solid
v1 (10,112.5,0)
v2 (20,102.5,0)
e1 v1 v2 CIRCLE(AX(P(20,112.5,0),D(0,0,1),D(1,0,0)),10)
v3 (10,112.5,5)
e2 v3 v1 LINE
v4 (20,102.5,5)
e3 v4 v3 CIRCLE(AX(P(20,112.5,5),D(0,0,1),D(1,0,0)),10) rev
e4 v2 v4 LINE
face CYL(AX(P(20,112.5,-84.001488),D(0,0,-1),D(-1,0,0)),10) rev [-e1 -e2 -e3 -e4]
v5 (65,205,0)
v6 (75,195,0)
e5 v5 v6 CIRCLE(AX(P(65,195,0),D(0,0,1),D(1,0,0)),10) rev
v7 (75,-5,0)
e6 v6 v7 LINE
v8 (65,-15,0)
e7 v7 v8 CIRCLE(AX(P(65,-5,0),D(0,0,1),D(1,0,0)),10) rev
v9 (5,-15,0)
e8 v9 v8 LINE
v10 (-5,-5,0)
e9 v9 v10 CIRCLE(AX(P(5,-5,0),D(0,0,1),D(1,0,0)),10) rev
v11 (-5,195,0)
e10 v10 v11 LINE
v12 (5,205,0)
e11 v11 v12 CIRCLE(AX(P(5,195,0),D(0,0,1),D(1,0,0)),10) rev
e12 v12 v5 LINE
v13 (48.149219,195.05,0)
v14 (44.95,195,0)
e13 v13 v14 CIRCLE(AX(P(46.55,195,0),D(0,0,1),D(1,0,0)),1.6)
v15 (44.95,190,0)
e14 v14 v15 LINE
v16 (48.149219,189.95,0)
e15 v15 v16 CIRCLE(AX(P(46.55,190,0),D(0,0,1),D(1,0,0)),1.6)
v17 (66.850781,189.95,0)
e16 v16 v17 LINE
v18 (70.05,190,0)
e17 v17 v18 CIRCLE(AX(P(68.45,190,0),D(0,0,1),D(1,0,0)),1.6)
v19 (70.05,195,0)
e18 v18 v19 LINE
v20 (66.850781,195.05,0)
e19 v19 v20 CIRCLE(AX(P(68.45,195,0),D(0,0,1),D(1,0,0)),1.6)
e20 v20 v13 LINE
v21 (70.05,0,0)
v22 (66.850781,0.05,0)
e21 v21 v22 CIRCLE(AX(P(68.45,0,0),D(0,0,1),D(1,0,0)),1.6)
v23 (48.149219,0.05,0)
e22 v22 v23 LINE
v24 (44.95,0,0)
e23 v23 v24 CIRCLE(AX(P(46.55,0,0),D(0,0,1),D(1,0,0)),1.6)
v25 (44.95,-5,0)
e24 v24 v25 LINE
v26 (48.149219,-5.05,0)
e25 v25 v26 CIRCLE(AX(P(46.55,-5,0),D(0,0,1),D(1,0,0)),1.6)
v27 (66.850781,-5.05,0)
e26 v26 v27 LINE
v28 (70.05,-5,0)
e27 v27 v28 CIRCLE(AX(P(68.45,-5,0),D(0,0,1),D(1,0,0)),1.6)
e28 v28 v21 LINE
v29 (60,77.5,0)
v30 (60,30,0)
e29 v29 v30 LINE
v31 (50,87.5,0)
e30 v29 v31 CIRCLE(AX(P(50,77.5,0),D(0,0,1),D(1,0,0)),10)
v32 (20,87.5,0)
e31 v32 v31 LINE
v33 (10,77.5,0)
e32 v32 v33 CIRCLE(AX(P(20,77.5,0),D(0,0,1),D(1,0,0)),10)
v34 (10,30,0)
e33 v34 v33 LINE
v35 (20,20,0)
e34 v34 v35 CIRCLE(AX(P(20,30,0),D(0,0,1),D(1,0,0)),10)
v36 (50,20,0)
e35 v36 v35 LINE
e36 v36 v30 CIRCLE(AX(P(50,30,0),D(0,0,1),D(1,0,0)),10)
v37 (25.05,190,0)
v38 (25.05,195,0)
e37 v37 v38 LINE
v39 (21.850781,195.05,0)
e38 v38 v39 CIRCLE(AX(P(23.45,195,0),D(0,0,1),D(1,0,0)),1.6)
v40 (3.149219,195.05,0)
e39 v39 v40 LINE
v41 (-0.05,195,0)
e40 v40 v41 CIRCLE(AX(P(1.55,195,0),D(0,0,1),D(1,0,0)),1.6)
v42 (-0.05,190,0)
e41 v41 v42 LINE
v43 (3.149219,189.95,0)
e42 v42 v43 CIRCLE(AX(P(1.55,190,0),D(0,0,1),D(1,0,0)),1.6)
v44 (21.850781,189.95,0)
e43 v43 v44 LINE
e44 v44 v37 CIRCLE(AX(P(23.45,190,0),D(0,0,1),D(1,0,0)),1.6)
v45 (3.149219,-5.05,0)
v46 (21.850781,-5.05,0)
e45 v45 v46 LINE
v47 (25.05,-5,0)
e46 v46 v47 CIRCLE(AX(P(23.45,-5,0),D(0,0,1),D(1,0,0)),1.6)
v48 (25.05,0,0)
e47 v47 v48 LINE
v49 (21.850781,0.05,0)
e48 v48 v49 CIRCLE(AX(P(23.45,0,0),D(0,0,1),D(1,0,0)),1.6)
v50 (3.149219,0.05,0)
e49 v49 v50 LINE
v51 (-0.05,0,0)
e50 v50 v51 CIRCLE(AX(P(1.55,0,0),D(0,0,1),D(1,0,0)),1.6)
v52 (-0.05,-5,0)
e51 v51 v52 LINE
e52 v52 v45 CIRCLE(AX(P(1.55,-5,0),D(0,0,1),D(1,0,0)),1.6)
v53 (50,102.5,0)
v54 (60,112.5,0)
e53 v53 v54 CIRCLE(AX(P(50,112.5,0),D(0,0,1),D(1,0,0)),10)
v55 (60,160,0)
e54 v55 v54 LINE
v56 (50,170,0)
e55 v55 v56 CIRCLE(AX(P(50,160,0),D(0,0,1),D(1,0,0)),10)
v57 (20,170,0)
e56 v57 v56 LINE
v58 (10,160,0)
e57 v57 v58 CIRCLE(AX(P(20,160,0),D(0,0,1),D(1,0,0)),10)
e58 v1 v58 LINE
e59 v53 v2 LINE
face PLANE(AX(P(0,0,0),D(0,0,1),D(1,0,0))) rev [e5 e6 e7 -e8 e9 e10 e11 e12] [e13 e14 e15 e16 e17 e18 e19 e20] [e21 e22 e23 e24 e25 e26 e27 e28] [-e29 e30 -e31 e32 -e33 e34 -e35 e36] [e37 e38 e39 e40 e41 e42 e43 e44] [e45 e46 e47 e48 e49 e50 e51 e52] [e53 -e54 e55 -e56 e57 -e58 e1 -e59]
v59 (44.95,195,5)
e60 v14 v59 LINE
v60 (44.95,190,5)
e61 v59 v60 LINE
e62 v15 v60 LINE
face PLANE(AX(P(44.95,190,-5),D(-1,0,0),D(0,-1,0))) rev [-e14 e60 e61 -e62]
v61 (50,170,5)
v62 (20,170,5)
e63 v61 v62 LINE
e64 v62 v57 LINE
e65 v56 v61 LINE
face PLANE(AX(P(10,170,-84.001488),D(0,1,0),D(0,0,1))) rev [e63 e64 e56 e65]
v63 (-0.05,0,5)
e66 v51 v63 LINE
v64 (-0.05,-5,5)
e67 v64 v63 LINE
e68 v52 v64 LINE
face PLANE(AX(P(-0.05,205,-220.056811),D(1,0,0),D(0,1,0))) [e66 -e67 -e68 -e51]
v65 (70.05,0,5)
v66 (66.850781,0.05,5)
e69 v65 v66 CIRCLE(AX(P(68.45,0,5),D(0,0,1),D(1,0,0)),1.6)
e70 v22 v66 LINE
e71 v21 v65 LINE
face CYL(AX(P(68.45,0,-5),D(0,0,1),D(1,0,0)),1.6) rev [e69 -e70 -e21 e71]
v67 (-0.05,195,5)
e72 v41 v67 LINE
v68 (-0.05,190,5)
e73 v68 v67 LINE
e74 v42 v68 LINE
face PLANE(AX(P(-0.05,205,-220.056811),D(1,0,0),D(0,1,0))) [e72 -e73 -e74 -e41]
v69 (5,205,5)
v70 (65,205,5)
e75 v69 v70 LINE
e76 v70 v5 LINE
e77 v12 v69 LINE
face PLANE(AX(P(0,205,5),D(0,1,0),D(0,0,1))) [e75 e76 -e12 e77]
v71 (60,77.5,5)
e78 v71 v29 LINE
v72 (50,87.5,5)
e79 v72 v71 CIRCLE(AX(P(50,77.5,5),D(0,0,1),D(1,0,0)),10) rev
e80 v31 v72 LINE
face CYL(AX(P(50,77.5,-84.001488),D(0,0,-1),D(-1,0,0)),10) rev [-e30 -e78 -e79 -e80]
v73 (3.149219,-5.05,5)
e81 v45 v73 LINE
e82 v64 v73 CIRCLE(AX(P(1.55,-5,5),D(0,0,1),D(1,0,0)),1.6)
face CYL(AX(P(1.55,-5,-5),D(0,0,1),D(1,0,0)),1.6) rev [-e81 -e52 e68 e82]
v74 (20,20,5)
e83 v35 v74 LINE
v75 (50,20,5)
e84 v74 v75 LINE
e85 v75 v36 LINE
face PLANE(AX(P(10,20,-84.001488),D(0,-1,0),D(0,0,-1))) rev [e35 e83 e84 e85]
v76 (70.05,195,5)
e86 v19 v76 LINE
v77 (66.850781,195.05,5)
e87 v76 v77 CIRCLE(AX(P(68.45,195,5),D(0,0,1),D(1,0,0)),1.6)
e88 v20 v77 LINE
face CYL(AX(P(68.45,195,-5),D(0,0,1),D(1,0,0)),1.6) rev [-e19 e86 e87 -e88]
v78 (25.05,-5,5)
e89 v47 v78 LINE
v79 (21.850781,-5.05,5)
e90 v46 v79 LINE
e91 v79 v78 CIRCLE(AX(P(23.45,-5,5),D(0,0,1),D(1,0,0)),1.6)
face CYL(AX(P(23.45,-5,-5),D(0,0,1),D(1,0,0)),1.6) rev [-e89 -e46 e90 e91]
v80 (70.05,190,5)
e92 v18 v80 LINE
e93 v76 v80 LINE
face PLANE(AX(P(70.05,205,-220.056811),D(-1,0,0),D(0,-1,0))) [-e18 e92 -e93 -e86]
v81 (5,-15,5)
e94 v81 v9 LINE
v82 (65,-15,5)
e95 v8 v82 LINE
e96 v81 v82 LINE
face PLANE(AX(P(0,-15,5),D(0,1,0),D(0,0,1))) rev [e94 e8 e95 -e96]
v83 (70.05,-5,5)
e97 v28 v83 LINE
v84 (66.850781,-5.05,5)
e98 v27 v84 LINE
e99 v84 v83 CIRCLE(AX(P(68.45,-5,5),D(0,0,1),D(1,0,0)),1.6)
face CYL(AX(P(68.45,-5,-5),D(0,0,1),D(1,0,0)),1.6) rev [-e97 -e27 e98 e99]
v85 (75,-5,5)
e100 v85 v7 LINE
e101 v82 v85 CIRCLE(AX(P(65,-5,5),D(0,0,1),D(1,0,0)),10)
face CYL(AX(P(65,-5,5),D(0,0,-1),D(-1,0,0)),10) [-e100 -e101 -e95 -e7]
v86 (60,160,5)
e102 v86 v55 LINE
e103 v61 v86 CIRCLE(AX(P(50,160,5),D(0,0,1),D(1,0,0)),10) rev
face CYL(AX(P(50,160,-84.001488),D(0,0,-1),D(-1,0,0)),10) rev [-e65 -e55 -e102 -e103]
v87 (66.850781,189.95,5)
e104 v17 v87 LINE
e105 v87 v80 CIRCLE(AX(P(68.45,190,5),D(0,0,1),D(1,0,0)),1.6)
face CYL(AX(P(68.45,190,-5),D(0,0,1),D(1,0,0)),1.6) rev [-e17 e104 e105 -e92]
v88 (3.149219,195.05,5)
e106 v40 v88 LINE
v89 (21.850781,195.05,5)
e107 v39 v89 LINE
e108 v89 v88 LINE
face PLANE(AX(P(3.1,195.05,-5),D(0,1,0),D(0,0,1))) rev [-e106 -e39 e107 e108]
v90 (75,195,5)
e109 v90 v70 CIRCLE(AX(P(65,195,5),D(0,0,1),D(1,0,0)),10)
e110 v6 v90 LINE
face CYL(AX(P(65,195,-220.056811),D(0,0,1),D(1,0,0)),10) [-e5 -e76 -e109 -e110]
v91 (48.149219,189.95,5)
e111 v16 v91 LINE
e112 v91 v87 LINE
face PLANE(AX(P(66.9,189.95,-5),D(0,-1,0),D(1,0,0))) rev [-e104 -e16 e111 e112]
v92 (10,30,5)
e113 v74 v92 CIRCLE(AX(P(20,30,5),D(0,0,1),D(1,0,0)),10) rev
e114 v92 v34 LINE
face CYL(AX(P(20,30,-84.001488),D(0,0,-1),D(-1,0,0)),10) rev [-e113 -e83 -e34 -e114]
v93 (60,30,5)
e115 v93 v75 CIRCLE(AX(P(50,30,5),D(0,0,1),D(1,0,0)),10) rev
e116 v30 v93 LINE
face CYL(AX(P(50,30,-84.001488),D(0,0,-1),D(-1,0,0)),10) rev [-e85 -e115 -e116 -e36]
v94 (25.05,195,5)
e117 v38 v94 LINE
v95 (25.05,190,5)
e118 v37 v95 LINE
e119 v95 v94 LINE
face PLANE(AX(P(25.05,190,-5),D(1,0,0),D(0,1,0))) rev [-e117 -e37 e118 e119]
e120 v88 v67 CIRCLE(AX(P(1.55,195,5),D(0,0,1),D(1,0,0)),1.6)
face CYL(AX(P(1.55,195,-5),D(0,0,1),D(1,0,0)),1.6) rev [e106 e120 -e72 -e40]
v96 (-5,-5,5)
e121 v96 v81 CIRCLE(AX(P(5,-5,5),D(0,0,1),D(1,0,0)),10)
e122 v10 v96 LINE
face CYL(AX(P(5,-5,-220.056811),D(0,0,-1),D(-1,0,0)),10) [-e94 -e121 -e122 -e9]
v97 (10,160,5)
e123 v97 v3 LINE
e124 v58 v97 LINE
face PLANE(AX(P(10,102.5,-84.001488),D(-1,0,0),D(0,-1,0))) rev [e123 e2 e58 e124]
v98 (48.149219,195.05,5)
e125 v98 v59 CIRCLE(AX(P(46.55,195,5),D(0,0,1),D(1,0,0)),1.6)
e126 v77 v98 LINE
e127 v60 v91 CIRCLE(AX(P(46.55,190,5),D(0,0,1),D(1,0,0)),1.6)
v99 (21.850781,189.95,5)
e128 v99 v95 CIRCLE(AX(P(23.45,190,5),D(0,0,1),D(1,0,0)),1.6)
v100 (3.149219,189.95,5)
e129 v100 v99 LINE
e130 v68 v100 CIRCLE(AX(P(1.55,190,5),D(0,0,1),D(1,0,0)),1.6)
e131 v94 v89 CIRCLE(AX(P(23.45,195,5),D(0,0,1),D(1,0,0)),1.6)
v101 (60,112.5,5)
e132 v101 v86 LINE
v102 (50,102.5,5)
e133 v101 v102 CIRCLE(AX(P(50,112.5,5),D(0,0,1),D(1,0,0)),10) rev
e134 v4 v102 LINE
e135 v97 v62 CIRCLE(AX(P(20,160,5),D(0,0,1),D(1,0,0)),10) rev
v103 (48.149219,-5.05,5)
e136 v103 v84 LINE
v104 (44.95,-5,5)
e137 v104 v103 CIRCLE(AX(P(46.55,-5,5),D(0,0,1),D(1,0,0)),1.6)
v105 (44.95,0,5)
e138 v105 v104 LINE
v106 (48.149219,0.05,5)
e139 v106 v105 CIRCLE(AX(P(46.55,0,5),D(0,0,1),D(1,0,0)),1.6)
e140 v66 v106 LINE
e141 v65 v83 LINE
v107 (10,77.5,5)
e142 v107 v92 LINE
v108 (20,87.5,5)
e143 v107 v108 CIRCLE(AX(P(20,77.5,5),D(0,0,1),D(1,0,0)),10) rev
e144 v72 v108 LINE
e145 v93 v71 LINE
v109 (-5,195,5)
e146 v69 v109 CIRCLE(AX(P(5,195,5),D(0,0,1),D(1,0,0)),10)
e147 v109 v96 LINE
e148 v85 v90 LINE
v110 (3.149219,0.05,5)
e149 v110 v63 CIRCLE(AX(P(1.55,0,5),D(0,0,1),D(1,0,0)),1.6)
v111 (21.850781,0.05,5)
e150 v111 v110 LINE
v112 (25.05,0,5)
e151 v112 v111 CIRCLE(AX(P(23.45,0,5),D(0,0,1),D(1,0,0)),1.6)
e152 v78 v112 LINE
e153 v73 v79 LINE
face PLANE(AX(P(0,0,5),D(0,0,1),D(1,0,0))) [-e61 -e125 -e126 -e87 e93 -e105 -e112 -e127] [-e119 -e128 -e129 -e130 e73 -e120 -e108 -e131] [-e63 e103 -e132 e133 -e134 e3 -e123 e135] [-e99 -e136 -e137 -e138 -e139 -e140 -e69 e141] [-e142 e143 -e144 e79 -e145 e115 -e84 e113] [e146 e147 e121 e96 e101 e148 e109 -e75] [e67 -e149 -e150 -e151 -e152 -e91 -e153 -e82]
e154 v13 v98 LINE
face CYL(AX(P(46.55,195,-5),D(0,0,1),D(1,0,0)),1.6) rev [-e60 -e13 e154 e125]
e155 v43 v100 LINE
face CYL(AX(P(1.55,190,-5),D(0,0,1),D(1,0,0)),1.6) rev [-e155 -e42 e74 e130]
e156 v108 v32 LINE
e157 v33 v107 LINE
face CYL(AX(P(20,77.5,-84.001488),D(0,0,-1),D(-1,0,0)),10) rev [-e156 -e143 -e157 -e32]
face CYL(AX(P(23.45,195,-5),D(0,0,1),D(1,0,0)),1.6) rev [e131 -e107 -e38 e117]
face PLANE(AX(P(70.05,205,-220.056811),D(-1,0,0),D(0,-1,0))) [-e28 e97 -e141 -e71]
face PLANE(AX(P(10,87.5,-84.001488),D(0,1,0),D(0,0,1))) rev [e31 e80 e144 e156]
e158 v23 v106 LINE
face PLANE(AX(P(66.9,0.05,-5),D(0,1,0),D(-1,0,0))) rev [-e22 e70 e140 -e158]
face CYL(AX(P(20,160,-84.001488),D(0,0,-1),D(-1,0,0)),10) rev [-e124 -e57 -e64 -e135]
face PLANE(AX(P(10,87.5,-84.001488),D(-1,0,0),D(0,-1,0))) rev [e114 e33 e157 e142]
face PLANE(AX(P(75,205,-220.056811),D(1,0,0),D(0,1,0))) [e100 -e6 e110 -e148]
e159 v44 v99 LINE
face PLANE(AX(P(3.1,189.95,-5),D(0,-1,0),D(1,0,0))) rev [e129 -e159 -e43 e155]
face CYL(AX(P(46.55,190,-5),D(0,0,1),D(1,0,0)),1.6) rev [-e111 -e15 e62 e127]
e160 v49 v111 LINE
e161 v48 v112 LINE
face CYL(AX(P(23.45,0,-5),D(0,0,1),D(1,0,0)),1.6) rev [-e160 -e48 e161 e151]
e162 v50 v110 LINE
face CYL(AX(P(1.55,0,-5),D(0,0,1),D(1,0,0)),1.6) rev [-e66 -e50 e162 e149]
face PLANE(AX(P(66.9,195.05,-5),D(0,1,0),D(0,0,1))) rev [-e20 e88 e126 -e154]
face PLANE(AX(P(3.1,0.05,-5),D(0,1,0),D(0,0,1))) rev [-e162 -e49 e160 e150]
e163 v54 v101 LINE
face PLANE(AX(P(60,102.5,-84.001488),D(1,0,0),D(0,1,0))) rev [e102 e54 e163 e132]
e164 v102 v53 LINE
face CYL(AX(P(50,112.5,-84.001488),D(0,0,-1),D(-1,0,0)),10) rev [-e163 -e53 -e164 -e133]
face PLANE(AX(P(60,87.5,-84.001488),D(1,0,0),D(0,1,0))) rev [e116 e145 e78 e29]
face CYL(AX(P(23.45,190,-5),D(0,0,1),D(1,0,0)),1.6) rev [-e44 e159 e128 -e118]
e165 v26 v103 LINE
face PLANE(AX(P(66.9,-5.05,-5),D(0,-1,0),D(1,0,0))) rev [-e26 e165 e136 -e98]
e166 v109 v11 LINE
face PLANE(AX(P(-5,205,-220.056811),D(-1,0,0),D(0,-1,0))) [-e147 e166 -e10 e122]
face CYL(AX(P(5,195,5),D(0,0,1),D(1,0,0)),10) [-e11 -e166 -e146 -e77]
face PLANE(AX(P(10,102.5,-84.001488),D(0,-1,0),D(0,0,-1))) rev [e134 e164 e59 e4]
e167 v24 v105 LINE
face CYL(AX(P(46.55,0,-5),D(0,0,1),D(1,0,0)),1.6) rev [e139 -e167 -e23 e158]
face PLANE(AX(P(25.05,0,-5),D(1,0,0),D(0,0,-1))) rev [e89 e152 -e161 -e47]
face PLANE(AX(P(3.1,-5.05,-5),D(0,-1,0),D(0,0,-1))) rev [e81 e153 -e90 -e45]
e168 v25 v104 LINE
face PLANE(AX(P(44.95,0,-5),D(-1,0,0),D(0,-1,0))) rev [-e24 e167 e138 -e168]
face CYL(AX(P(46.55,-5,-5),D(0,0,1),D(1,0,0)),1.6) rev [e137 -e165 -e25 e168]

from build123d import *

# Parameters (mm, degrees)
SKETCH_1_W          = 25
SKETCH_1_H          = 5
SKETCH_1_W_2        = 70
SKETCH_1_H_2        = 190
EXTRUDE_1_DEPTH     = 5
SKETCH_3_W          = 50
SKETCH_3_H          = 67.5
CUT_EXTRUDE_2_DEPTH = 5
FILLET_1_R          = 10
CUT_EXTRUDE_3_DEPTH = 10
SKETCH_6_W          = 5
SKETCH_6_H          = 220
EXTRUDE_2_DEPTH     = 5
MOVE_FACE_1_DEPTH   = 5
FILLET_2_R          = 10


# Read off the part's stored shape, not the designer's step: 移动面1
with BuildPart() as part:
    # 草图1 → 凸台-拉伸1 (new body)
    with BuildSketch(Plane.XY):
        with Locations((57.5, 192.5)):
            Rectangle(SKETCH_1_W, SKETCH_1_H)
        with Locations((35, 95)):
            Rectangle(SKETCH_1_W_2, SKETCH_1_H_2)
        with Locations((12.5, 192.5)):
            Rectangle(SKETCH_1_W, SKETCH_1_H)
        with Locations((57.5, -2.5)):
            Rectangle(SKETCH_1_W, SKETCH_1_H)
        with Locations((12.5, -2.5)):
            Rectangle(SKETCH_1_W, SKETCH_1_H)
        Polygon((25, -5), (0, -5), (0, -15), (70, -15), (70, -5), (45, -5), (45, 0), (25, 0), align=None)
        Polygon((25, 195), (25, 190), (45, 190), (45, 195), (70, 195), (70, 205), (0, 205), (0, 195), align=None)
    extrude(amount=EXTRUDE_1_DEPTH)

    # 草图3 → 切除-拉伸2 (cut)
    with BuildSketch(Plane.XY.offset(5)):
        with Locations((35, 53.75)):
            Rectangle(SKETCH_3_W, SKETCH_3_H)
        with Locations((35, 136.25)):
            Rectangle(SKETCH_3_W, SKETCH_3_H)
    extrude(amount=-CUT_EXTRUDE_2_DEPTH, mode=Mode.SUBTRACT)

    # 圆角1
    fillet_1_edges = [part.edges().sort_by_distance(p)[0] for p in [
        (10, 20, 2.5),
        (10, 87.5, 2.5),
        (60, 87.5, 2.5),
        (60, 20, 2.5),
        (10, 102.5, 2.5),
        (10, 170, 2.5),
        (60, 170, 2.5),
        (60, 102.5, 2.5),
    ]]
    fillet(fillet_1_edges, radius=FILLET_1_R)

    # 草图5 → 切除-拉伸3 (cut)
    with BuildSketch(Plane.XY.offset(5)):
        with BuildLine():
            Line((3.1, 0), (21.9, 0))
            ThreePointArc((21.9, 0), (23.45, 1.55), (25, 0))
            Line((25, 0), (25, -5))
            ThreePointArc((25, -5), (23.45, -6.55), (21.9, -5))
            Line((21.9, -5), (3.1, -5))
            ThreePointArc((3.1, -5), (1.55, -6.55), (0, -5))
            Line((0, -5), (0, 0))
            ThreePointArc((0, 0), (1.55, 1.55), (3.1, 0))
        make_face()
        with BuildLine():
            Line((45, 0), (45, -5))
            ThreePointArc((45, -5), (46.55, -6.55), (48.1, -5))
            Line((48.1, -5), (66.9, -5))
            ThreePointArc((66.9, -5), (68.45, -6.55), (70, -5))
            Line((70, -5), (70, 0))
            ThreePointArc((70, 0), (68.45, 1.55), (66.9, 0))
            Line((66.9, 0), (48.1, 0))
            ThreePointArc((48.1, 0), (46.55, 1.55), (45, 0))
        make_face()
        with BuildLine():
            Line((66.9, 190), (48.1, 190))
            ThreePointArc((48.1, 190), (46.55, 188.45), (45, 190))
            Line((45, 190), (45, 195))
            ThreePointArc((45, 195), (46.55, 196.55), (48.1, 195))
            Line((48.1, 195), (66.9, 195))
            ThreePointArc((66.9, 195), (68.45, 196.55), (70, 195))
            Line((70, 195), (70, 190))
            ThreePointArc((70, 190), (68.45, 188.45), (66.9, 190))
        make_face()
        with BuildLine():
            Line((25, 190), (25, 195))
            ThreePointArc((25, 195), (23.45, 196.55), (21.9, 195))
            Line((21.9, 195), (3.1, 195))
            ThreePointArc((3.1, 195), (1.55, 196.55), (0, 195))
            Line((0, 195), (0, 190))
            ThreePointArc((0, 190), (1.55, 188.45), (3.1, 190))
            Line((3.1, 190), (21.9, 190))
            ThreePointArc((21.9, 190), (23.45, 188.45), (25, 190))
        make_face()
    extrude(amount=-CUT_EXTRUDE_3_DEPTH, mode=Mode.SUBTRACT)

    # 草图6 → 凸台-拉伸2 (add)
    with BuildSketch(Plane.XY.offset(5)):
        with Locations((72.5, 95)):
            Rectangle(SKETCH_6_W, SKETCH_6_H)
        with Locations((-2.5, 95)):
            Rectangle(SKETCH_6_W, SKETCH_6_H)
    extrude(amount=-EXTRUDE_2_DEPTH)

    # Move Face 1 outline → Move Face 1 (cut)
    # profile 1 of 4: a face of its own
    with BuildSketch(Plane.XY):
        with BuildLine():
            Line((21.850781441, 0.05), (3.149218559, 0.05))
            ThreePointArc((3.149218559, 0.05), (1.524996947, 1.599804628), (-0.05, 0))
            Line((-0.05, 0), (-0.05, -5))
            ThreePointArc((-0.05, -5), (1.524996947, -6.599804628), (3.149218559, -5.05))
            Line((3.149218559, -5.05), (21.850781441, -5.05))
            ThreePointArc((21.850781441, -5.05), (23.475003053, -6.599804628), (25.05, -5))
            Line((25.05, -5), (25.05, 0))
            ThreePointArc((25.05, 0), (23.475003053, 1.599804628), (21.850781441, 0.05))
        make_face()
        with BuildLine():
            ThreePointArc((0, 0), (1.55, 1.55), (3.1, 0))
            Line((3.1, 0), (21.9, 0))
            ThreePointArc((21.9, 0), (23.45, 1.55), (25, 0))
            Line((25, 0), (25, -5))
            ThreePointArc((25, -5), (23.45, -6.55), (21.9, -5))
            Line((21.9, -5), (3.1, -5))
            ThreePointArc((3.1, -5), (1.55, -6.55), (0, -5))
            Line((0, -5), (0, 0))
        make_face(mode=Mode.SUBTRACT)
    # profile 2 of 4: a face of its own
    with BuildSketch(Plane.XY):
        with BuildLine():
            ThreePointArc((70.05, 0), (68.475003053, 1.599804628), (66.850781441, 0.05))
            Line((66.850781441, 0.05), (48.149218559, 0.05))
            ThreePointArc((48.149218559, 0.05), (46.524996947, 1.599804628), (44.95, 0))
            Line((44.95, 0), (44.95, -5))
            ThreePointArc((44.95, -5), (46.524996947, -6.599804628), (48.149218559, -5.05))
            Line((48.149218559, -5.05), (66.850781441, -5.05))
            ThreePointArc((66.850781441, -5.05), (68.475003053, -6.599804628), (70.05, -5))
            Line((70.05, -5), (70.05, 0))
        make_face()
        with BuildLine():
            Line((48.1, 0), (66.9, 0))
            ThreePointArc((66.9, 0), (68.45, 1.55), (70, 0))
            Line((70, 0), (70, -5))
            ThreePointArc((70, -5), (68.45, -6.55), (66.9, -5))
            Line((66.9, -5), (48.1, -5))
            ThreePointArc((48.1, -5), (46.55, -6.55), (45, -5))
            Line((45, -5), (45, 0))
            ThreePointArc((45, 0), (46.55, 1.55), (48.1, 0))
        make_face(mode=Mode.SUBTRACT)
    # profile 3 of 4: a face of its own
    with BuildSketch(Plane.XY):
        with BuildLine():
            ThreePointArc((21.850781441, 189.95), (23.475003053, 188.400195372), (25.05, 190))
            Line((25.05, 190), (25.05, 195))
            ThreePointArc((25.05, 195), (23.475003053, 196.599804628), (21.850781441, 195.05))
            Line((21.850781441, 195.05), (3.149218559, 195.05))
            ThreePointArc((3.149218559, 195.05), (1.524996947, 196.599804628), (-0.05, 195))
            Line((-0.05, 195), (-0.05, 190))
            ThreePointArc((-0.05, 190), (1.524996947, 188.400195372), (3.149218559, 189.95))
            Line((3.149218559, 189.95), (21.850781441, 189.95))
        make_face()
        with BuildLine():
            Line((25, 195), (25, 190))
            ThreePointArc((25, 190), (23.45, 188.45), (21.9, 190))
            Line((21.9, 190), (3.1, 190))
            ThreePointArc((3.1, 190), (1.55, 188.45), (0, 190))
            Line((0, 190), (0, 195))
            ThreePointArc((0, 195), (1.55, 196.55), (3.1, 195))
            Line((3.1, 195), (21.9, 195))
            ThreePointArc((21.9, 195), (23.45, 196.55), (25, 195))
        make_face(mode=Mode.SUBTRACT)
    # profile 4 of 4: a face of its own
    with BuildSketch(Plane.XY):
        with BuildLine():
            ThreePointArc((48.149218559, 195.05), (46.524996947, 196.599804628), (44.95, 195))
            Line((44.95, 195), (44.95, 190))
            ThreePointArc((44.95, 190), (46.524996947, 188.400195372), (48.149218559, 189.95))
            Line((48.149218559, 189.95), (66.850781441, 189.95))
            ThreePointArc((66.850781441, 189.95), (68.475003053, 188.400195372), (70.05, 190))
            Line((70.05, 190), (70.05, 195))
            ThreePointArc((70.05, 195), (68.475003053, 196.599804628), (66.850781441, 195.05))
            Line((66.850781441, 195.05), (48.149218559, 195.05))
        make_face()
        with BuildLine():
            Line((45, 190), (45, 195))
            ThreePointArc((45, 195), (46.55, 196.55), (48.1, 195))
            Line((48.1, 195), (66.9, 195))
            ThreePointArc((66.9, 195), (68.45, 196.55), (70, 195))
            Line((70, 195), (70, 190))
            ThreePointArc((70, 190), (68.45, 188.45), (66.9, 190))
            Line((66.9, 190), (48.1, 190))
            ThreePointArc((48.1, 190), (46.55, 188.45), (45, 190))
        make_face(mode=Mode.SUBTRACT)
    extrude(amount=MOVE_FACE_1_DEPTH, mode=Mode.SUBTRACT)

    # 圆角2
    fillet_2_edges = [part.edges().sort_by_distance(p)[0] for p in [
        (75, 205, 2.5),
        (75, -15, 2.5),
        (-5, -15, 2.5),
        (-5, 205, 2.5),
    ]]
    fillet(fillet_2_edges, radius=FILLET_2_R)


solid = part.part
